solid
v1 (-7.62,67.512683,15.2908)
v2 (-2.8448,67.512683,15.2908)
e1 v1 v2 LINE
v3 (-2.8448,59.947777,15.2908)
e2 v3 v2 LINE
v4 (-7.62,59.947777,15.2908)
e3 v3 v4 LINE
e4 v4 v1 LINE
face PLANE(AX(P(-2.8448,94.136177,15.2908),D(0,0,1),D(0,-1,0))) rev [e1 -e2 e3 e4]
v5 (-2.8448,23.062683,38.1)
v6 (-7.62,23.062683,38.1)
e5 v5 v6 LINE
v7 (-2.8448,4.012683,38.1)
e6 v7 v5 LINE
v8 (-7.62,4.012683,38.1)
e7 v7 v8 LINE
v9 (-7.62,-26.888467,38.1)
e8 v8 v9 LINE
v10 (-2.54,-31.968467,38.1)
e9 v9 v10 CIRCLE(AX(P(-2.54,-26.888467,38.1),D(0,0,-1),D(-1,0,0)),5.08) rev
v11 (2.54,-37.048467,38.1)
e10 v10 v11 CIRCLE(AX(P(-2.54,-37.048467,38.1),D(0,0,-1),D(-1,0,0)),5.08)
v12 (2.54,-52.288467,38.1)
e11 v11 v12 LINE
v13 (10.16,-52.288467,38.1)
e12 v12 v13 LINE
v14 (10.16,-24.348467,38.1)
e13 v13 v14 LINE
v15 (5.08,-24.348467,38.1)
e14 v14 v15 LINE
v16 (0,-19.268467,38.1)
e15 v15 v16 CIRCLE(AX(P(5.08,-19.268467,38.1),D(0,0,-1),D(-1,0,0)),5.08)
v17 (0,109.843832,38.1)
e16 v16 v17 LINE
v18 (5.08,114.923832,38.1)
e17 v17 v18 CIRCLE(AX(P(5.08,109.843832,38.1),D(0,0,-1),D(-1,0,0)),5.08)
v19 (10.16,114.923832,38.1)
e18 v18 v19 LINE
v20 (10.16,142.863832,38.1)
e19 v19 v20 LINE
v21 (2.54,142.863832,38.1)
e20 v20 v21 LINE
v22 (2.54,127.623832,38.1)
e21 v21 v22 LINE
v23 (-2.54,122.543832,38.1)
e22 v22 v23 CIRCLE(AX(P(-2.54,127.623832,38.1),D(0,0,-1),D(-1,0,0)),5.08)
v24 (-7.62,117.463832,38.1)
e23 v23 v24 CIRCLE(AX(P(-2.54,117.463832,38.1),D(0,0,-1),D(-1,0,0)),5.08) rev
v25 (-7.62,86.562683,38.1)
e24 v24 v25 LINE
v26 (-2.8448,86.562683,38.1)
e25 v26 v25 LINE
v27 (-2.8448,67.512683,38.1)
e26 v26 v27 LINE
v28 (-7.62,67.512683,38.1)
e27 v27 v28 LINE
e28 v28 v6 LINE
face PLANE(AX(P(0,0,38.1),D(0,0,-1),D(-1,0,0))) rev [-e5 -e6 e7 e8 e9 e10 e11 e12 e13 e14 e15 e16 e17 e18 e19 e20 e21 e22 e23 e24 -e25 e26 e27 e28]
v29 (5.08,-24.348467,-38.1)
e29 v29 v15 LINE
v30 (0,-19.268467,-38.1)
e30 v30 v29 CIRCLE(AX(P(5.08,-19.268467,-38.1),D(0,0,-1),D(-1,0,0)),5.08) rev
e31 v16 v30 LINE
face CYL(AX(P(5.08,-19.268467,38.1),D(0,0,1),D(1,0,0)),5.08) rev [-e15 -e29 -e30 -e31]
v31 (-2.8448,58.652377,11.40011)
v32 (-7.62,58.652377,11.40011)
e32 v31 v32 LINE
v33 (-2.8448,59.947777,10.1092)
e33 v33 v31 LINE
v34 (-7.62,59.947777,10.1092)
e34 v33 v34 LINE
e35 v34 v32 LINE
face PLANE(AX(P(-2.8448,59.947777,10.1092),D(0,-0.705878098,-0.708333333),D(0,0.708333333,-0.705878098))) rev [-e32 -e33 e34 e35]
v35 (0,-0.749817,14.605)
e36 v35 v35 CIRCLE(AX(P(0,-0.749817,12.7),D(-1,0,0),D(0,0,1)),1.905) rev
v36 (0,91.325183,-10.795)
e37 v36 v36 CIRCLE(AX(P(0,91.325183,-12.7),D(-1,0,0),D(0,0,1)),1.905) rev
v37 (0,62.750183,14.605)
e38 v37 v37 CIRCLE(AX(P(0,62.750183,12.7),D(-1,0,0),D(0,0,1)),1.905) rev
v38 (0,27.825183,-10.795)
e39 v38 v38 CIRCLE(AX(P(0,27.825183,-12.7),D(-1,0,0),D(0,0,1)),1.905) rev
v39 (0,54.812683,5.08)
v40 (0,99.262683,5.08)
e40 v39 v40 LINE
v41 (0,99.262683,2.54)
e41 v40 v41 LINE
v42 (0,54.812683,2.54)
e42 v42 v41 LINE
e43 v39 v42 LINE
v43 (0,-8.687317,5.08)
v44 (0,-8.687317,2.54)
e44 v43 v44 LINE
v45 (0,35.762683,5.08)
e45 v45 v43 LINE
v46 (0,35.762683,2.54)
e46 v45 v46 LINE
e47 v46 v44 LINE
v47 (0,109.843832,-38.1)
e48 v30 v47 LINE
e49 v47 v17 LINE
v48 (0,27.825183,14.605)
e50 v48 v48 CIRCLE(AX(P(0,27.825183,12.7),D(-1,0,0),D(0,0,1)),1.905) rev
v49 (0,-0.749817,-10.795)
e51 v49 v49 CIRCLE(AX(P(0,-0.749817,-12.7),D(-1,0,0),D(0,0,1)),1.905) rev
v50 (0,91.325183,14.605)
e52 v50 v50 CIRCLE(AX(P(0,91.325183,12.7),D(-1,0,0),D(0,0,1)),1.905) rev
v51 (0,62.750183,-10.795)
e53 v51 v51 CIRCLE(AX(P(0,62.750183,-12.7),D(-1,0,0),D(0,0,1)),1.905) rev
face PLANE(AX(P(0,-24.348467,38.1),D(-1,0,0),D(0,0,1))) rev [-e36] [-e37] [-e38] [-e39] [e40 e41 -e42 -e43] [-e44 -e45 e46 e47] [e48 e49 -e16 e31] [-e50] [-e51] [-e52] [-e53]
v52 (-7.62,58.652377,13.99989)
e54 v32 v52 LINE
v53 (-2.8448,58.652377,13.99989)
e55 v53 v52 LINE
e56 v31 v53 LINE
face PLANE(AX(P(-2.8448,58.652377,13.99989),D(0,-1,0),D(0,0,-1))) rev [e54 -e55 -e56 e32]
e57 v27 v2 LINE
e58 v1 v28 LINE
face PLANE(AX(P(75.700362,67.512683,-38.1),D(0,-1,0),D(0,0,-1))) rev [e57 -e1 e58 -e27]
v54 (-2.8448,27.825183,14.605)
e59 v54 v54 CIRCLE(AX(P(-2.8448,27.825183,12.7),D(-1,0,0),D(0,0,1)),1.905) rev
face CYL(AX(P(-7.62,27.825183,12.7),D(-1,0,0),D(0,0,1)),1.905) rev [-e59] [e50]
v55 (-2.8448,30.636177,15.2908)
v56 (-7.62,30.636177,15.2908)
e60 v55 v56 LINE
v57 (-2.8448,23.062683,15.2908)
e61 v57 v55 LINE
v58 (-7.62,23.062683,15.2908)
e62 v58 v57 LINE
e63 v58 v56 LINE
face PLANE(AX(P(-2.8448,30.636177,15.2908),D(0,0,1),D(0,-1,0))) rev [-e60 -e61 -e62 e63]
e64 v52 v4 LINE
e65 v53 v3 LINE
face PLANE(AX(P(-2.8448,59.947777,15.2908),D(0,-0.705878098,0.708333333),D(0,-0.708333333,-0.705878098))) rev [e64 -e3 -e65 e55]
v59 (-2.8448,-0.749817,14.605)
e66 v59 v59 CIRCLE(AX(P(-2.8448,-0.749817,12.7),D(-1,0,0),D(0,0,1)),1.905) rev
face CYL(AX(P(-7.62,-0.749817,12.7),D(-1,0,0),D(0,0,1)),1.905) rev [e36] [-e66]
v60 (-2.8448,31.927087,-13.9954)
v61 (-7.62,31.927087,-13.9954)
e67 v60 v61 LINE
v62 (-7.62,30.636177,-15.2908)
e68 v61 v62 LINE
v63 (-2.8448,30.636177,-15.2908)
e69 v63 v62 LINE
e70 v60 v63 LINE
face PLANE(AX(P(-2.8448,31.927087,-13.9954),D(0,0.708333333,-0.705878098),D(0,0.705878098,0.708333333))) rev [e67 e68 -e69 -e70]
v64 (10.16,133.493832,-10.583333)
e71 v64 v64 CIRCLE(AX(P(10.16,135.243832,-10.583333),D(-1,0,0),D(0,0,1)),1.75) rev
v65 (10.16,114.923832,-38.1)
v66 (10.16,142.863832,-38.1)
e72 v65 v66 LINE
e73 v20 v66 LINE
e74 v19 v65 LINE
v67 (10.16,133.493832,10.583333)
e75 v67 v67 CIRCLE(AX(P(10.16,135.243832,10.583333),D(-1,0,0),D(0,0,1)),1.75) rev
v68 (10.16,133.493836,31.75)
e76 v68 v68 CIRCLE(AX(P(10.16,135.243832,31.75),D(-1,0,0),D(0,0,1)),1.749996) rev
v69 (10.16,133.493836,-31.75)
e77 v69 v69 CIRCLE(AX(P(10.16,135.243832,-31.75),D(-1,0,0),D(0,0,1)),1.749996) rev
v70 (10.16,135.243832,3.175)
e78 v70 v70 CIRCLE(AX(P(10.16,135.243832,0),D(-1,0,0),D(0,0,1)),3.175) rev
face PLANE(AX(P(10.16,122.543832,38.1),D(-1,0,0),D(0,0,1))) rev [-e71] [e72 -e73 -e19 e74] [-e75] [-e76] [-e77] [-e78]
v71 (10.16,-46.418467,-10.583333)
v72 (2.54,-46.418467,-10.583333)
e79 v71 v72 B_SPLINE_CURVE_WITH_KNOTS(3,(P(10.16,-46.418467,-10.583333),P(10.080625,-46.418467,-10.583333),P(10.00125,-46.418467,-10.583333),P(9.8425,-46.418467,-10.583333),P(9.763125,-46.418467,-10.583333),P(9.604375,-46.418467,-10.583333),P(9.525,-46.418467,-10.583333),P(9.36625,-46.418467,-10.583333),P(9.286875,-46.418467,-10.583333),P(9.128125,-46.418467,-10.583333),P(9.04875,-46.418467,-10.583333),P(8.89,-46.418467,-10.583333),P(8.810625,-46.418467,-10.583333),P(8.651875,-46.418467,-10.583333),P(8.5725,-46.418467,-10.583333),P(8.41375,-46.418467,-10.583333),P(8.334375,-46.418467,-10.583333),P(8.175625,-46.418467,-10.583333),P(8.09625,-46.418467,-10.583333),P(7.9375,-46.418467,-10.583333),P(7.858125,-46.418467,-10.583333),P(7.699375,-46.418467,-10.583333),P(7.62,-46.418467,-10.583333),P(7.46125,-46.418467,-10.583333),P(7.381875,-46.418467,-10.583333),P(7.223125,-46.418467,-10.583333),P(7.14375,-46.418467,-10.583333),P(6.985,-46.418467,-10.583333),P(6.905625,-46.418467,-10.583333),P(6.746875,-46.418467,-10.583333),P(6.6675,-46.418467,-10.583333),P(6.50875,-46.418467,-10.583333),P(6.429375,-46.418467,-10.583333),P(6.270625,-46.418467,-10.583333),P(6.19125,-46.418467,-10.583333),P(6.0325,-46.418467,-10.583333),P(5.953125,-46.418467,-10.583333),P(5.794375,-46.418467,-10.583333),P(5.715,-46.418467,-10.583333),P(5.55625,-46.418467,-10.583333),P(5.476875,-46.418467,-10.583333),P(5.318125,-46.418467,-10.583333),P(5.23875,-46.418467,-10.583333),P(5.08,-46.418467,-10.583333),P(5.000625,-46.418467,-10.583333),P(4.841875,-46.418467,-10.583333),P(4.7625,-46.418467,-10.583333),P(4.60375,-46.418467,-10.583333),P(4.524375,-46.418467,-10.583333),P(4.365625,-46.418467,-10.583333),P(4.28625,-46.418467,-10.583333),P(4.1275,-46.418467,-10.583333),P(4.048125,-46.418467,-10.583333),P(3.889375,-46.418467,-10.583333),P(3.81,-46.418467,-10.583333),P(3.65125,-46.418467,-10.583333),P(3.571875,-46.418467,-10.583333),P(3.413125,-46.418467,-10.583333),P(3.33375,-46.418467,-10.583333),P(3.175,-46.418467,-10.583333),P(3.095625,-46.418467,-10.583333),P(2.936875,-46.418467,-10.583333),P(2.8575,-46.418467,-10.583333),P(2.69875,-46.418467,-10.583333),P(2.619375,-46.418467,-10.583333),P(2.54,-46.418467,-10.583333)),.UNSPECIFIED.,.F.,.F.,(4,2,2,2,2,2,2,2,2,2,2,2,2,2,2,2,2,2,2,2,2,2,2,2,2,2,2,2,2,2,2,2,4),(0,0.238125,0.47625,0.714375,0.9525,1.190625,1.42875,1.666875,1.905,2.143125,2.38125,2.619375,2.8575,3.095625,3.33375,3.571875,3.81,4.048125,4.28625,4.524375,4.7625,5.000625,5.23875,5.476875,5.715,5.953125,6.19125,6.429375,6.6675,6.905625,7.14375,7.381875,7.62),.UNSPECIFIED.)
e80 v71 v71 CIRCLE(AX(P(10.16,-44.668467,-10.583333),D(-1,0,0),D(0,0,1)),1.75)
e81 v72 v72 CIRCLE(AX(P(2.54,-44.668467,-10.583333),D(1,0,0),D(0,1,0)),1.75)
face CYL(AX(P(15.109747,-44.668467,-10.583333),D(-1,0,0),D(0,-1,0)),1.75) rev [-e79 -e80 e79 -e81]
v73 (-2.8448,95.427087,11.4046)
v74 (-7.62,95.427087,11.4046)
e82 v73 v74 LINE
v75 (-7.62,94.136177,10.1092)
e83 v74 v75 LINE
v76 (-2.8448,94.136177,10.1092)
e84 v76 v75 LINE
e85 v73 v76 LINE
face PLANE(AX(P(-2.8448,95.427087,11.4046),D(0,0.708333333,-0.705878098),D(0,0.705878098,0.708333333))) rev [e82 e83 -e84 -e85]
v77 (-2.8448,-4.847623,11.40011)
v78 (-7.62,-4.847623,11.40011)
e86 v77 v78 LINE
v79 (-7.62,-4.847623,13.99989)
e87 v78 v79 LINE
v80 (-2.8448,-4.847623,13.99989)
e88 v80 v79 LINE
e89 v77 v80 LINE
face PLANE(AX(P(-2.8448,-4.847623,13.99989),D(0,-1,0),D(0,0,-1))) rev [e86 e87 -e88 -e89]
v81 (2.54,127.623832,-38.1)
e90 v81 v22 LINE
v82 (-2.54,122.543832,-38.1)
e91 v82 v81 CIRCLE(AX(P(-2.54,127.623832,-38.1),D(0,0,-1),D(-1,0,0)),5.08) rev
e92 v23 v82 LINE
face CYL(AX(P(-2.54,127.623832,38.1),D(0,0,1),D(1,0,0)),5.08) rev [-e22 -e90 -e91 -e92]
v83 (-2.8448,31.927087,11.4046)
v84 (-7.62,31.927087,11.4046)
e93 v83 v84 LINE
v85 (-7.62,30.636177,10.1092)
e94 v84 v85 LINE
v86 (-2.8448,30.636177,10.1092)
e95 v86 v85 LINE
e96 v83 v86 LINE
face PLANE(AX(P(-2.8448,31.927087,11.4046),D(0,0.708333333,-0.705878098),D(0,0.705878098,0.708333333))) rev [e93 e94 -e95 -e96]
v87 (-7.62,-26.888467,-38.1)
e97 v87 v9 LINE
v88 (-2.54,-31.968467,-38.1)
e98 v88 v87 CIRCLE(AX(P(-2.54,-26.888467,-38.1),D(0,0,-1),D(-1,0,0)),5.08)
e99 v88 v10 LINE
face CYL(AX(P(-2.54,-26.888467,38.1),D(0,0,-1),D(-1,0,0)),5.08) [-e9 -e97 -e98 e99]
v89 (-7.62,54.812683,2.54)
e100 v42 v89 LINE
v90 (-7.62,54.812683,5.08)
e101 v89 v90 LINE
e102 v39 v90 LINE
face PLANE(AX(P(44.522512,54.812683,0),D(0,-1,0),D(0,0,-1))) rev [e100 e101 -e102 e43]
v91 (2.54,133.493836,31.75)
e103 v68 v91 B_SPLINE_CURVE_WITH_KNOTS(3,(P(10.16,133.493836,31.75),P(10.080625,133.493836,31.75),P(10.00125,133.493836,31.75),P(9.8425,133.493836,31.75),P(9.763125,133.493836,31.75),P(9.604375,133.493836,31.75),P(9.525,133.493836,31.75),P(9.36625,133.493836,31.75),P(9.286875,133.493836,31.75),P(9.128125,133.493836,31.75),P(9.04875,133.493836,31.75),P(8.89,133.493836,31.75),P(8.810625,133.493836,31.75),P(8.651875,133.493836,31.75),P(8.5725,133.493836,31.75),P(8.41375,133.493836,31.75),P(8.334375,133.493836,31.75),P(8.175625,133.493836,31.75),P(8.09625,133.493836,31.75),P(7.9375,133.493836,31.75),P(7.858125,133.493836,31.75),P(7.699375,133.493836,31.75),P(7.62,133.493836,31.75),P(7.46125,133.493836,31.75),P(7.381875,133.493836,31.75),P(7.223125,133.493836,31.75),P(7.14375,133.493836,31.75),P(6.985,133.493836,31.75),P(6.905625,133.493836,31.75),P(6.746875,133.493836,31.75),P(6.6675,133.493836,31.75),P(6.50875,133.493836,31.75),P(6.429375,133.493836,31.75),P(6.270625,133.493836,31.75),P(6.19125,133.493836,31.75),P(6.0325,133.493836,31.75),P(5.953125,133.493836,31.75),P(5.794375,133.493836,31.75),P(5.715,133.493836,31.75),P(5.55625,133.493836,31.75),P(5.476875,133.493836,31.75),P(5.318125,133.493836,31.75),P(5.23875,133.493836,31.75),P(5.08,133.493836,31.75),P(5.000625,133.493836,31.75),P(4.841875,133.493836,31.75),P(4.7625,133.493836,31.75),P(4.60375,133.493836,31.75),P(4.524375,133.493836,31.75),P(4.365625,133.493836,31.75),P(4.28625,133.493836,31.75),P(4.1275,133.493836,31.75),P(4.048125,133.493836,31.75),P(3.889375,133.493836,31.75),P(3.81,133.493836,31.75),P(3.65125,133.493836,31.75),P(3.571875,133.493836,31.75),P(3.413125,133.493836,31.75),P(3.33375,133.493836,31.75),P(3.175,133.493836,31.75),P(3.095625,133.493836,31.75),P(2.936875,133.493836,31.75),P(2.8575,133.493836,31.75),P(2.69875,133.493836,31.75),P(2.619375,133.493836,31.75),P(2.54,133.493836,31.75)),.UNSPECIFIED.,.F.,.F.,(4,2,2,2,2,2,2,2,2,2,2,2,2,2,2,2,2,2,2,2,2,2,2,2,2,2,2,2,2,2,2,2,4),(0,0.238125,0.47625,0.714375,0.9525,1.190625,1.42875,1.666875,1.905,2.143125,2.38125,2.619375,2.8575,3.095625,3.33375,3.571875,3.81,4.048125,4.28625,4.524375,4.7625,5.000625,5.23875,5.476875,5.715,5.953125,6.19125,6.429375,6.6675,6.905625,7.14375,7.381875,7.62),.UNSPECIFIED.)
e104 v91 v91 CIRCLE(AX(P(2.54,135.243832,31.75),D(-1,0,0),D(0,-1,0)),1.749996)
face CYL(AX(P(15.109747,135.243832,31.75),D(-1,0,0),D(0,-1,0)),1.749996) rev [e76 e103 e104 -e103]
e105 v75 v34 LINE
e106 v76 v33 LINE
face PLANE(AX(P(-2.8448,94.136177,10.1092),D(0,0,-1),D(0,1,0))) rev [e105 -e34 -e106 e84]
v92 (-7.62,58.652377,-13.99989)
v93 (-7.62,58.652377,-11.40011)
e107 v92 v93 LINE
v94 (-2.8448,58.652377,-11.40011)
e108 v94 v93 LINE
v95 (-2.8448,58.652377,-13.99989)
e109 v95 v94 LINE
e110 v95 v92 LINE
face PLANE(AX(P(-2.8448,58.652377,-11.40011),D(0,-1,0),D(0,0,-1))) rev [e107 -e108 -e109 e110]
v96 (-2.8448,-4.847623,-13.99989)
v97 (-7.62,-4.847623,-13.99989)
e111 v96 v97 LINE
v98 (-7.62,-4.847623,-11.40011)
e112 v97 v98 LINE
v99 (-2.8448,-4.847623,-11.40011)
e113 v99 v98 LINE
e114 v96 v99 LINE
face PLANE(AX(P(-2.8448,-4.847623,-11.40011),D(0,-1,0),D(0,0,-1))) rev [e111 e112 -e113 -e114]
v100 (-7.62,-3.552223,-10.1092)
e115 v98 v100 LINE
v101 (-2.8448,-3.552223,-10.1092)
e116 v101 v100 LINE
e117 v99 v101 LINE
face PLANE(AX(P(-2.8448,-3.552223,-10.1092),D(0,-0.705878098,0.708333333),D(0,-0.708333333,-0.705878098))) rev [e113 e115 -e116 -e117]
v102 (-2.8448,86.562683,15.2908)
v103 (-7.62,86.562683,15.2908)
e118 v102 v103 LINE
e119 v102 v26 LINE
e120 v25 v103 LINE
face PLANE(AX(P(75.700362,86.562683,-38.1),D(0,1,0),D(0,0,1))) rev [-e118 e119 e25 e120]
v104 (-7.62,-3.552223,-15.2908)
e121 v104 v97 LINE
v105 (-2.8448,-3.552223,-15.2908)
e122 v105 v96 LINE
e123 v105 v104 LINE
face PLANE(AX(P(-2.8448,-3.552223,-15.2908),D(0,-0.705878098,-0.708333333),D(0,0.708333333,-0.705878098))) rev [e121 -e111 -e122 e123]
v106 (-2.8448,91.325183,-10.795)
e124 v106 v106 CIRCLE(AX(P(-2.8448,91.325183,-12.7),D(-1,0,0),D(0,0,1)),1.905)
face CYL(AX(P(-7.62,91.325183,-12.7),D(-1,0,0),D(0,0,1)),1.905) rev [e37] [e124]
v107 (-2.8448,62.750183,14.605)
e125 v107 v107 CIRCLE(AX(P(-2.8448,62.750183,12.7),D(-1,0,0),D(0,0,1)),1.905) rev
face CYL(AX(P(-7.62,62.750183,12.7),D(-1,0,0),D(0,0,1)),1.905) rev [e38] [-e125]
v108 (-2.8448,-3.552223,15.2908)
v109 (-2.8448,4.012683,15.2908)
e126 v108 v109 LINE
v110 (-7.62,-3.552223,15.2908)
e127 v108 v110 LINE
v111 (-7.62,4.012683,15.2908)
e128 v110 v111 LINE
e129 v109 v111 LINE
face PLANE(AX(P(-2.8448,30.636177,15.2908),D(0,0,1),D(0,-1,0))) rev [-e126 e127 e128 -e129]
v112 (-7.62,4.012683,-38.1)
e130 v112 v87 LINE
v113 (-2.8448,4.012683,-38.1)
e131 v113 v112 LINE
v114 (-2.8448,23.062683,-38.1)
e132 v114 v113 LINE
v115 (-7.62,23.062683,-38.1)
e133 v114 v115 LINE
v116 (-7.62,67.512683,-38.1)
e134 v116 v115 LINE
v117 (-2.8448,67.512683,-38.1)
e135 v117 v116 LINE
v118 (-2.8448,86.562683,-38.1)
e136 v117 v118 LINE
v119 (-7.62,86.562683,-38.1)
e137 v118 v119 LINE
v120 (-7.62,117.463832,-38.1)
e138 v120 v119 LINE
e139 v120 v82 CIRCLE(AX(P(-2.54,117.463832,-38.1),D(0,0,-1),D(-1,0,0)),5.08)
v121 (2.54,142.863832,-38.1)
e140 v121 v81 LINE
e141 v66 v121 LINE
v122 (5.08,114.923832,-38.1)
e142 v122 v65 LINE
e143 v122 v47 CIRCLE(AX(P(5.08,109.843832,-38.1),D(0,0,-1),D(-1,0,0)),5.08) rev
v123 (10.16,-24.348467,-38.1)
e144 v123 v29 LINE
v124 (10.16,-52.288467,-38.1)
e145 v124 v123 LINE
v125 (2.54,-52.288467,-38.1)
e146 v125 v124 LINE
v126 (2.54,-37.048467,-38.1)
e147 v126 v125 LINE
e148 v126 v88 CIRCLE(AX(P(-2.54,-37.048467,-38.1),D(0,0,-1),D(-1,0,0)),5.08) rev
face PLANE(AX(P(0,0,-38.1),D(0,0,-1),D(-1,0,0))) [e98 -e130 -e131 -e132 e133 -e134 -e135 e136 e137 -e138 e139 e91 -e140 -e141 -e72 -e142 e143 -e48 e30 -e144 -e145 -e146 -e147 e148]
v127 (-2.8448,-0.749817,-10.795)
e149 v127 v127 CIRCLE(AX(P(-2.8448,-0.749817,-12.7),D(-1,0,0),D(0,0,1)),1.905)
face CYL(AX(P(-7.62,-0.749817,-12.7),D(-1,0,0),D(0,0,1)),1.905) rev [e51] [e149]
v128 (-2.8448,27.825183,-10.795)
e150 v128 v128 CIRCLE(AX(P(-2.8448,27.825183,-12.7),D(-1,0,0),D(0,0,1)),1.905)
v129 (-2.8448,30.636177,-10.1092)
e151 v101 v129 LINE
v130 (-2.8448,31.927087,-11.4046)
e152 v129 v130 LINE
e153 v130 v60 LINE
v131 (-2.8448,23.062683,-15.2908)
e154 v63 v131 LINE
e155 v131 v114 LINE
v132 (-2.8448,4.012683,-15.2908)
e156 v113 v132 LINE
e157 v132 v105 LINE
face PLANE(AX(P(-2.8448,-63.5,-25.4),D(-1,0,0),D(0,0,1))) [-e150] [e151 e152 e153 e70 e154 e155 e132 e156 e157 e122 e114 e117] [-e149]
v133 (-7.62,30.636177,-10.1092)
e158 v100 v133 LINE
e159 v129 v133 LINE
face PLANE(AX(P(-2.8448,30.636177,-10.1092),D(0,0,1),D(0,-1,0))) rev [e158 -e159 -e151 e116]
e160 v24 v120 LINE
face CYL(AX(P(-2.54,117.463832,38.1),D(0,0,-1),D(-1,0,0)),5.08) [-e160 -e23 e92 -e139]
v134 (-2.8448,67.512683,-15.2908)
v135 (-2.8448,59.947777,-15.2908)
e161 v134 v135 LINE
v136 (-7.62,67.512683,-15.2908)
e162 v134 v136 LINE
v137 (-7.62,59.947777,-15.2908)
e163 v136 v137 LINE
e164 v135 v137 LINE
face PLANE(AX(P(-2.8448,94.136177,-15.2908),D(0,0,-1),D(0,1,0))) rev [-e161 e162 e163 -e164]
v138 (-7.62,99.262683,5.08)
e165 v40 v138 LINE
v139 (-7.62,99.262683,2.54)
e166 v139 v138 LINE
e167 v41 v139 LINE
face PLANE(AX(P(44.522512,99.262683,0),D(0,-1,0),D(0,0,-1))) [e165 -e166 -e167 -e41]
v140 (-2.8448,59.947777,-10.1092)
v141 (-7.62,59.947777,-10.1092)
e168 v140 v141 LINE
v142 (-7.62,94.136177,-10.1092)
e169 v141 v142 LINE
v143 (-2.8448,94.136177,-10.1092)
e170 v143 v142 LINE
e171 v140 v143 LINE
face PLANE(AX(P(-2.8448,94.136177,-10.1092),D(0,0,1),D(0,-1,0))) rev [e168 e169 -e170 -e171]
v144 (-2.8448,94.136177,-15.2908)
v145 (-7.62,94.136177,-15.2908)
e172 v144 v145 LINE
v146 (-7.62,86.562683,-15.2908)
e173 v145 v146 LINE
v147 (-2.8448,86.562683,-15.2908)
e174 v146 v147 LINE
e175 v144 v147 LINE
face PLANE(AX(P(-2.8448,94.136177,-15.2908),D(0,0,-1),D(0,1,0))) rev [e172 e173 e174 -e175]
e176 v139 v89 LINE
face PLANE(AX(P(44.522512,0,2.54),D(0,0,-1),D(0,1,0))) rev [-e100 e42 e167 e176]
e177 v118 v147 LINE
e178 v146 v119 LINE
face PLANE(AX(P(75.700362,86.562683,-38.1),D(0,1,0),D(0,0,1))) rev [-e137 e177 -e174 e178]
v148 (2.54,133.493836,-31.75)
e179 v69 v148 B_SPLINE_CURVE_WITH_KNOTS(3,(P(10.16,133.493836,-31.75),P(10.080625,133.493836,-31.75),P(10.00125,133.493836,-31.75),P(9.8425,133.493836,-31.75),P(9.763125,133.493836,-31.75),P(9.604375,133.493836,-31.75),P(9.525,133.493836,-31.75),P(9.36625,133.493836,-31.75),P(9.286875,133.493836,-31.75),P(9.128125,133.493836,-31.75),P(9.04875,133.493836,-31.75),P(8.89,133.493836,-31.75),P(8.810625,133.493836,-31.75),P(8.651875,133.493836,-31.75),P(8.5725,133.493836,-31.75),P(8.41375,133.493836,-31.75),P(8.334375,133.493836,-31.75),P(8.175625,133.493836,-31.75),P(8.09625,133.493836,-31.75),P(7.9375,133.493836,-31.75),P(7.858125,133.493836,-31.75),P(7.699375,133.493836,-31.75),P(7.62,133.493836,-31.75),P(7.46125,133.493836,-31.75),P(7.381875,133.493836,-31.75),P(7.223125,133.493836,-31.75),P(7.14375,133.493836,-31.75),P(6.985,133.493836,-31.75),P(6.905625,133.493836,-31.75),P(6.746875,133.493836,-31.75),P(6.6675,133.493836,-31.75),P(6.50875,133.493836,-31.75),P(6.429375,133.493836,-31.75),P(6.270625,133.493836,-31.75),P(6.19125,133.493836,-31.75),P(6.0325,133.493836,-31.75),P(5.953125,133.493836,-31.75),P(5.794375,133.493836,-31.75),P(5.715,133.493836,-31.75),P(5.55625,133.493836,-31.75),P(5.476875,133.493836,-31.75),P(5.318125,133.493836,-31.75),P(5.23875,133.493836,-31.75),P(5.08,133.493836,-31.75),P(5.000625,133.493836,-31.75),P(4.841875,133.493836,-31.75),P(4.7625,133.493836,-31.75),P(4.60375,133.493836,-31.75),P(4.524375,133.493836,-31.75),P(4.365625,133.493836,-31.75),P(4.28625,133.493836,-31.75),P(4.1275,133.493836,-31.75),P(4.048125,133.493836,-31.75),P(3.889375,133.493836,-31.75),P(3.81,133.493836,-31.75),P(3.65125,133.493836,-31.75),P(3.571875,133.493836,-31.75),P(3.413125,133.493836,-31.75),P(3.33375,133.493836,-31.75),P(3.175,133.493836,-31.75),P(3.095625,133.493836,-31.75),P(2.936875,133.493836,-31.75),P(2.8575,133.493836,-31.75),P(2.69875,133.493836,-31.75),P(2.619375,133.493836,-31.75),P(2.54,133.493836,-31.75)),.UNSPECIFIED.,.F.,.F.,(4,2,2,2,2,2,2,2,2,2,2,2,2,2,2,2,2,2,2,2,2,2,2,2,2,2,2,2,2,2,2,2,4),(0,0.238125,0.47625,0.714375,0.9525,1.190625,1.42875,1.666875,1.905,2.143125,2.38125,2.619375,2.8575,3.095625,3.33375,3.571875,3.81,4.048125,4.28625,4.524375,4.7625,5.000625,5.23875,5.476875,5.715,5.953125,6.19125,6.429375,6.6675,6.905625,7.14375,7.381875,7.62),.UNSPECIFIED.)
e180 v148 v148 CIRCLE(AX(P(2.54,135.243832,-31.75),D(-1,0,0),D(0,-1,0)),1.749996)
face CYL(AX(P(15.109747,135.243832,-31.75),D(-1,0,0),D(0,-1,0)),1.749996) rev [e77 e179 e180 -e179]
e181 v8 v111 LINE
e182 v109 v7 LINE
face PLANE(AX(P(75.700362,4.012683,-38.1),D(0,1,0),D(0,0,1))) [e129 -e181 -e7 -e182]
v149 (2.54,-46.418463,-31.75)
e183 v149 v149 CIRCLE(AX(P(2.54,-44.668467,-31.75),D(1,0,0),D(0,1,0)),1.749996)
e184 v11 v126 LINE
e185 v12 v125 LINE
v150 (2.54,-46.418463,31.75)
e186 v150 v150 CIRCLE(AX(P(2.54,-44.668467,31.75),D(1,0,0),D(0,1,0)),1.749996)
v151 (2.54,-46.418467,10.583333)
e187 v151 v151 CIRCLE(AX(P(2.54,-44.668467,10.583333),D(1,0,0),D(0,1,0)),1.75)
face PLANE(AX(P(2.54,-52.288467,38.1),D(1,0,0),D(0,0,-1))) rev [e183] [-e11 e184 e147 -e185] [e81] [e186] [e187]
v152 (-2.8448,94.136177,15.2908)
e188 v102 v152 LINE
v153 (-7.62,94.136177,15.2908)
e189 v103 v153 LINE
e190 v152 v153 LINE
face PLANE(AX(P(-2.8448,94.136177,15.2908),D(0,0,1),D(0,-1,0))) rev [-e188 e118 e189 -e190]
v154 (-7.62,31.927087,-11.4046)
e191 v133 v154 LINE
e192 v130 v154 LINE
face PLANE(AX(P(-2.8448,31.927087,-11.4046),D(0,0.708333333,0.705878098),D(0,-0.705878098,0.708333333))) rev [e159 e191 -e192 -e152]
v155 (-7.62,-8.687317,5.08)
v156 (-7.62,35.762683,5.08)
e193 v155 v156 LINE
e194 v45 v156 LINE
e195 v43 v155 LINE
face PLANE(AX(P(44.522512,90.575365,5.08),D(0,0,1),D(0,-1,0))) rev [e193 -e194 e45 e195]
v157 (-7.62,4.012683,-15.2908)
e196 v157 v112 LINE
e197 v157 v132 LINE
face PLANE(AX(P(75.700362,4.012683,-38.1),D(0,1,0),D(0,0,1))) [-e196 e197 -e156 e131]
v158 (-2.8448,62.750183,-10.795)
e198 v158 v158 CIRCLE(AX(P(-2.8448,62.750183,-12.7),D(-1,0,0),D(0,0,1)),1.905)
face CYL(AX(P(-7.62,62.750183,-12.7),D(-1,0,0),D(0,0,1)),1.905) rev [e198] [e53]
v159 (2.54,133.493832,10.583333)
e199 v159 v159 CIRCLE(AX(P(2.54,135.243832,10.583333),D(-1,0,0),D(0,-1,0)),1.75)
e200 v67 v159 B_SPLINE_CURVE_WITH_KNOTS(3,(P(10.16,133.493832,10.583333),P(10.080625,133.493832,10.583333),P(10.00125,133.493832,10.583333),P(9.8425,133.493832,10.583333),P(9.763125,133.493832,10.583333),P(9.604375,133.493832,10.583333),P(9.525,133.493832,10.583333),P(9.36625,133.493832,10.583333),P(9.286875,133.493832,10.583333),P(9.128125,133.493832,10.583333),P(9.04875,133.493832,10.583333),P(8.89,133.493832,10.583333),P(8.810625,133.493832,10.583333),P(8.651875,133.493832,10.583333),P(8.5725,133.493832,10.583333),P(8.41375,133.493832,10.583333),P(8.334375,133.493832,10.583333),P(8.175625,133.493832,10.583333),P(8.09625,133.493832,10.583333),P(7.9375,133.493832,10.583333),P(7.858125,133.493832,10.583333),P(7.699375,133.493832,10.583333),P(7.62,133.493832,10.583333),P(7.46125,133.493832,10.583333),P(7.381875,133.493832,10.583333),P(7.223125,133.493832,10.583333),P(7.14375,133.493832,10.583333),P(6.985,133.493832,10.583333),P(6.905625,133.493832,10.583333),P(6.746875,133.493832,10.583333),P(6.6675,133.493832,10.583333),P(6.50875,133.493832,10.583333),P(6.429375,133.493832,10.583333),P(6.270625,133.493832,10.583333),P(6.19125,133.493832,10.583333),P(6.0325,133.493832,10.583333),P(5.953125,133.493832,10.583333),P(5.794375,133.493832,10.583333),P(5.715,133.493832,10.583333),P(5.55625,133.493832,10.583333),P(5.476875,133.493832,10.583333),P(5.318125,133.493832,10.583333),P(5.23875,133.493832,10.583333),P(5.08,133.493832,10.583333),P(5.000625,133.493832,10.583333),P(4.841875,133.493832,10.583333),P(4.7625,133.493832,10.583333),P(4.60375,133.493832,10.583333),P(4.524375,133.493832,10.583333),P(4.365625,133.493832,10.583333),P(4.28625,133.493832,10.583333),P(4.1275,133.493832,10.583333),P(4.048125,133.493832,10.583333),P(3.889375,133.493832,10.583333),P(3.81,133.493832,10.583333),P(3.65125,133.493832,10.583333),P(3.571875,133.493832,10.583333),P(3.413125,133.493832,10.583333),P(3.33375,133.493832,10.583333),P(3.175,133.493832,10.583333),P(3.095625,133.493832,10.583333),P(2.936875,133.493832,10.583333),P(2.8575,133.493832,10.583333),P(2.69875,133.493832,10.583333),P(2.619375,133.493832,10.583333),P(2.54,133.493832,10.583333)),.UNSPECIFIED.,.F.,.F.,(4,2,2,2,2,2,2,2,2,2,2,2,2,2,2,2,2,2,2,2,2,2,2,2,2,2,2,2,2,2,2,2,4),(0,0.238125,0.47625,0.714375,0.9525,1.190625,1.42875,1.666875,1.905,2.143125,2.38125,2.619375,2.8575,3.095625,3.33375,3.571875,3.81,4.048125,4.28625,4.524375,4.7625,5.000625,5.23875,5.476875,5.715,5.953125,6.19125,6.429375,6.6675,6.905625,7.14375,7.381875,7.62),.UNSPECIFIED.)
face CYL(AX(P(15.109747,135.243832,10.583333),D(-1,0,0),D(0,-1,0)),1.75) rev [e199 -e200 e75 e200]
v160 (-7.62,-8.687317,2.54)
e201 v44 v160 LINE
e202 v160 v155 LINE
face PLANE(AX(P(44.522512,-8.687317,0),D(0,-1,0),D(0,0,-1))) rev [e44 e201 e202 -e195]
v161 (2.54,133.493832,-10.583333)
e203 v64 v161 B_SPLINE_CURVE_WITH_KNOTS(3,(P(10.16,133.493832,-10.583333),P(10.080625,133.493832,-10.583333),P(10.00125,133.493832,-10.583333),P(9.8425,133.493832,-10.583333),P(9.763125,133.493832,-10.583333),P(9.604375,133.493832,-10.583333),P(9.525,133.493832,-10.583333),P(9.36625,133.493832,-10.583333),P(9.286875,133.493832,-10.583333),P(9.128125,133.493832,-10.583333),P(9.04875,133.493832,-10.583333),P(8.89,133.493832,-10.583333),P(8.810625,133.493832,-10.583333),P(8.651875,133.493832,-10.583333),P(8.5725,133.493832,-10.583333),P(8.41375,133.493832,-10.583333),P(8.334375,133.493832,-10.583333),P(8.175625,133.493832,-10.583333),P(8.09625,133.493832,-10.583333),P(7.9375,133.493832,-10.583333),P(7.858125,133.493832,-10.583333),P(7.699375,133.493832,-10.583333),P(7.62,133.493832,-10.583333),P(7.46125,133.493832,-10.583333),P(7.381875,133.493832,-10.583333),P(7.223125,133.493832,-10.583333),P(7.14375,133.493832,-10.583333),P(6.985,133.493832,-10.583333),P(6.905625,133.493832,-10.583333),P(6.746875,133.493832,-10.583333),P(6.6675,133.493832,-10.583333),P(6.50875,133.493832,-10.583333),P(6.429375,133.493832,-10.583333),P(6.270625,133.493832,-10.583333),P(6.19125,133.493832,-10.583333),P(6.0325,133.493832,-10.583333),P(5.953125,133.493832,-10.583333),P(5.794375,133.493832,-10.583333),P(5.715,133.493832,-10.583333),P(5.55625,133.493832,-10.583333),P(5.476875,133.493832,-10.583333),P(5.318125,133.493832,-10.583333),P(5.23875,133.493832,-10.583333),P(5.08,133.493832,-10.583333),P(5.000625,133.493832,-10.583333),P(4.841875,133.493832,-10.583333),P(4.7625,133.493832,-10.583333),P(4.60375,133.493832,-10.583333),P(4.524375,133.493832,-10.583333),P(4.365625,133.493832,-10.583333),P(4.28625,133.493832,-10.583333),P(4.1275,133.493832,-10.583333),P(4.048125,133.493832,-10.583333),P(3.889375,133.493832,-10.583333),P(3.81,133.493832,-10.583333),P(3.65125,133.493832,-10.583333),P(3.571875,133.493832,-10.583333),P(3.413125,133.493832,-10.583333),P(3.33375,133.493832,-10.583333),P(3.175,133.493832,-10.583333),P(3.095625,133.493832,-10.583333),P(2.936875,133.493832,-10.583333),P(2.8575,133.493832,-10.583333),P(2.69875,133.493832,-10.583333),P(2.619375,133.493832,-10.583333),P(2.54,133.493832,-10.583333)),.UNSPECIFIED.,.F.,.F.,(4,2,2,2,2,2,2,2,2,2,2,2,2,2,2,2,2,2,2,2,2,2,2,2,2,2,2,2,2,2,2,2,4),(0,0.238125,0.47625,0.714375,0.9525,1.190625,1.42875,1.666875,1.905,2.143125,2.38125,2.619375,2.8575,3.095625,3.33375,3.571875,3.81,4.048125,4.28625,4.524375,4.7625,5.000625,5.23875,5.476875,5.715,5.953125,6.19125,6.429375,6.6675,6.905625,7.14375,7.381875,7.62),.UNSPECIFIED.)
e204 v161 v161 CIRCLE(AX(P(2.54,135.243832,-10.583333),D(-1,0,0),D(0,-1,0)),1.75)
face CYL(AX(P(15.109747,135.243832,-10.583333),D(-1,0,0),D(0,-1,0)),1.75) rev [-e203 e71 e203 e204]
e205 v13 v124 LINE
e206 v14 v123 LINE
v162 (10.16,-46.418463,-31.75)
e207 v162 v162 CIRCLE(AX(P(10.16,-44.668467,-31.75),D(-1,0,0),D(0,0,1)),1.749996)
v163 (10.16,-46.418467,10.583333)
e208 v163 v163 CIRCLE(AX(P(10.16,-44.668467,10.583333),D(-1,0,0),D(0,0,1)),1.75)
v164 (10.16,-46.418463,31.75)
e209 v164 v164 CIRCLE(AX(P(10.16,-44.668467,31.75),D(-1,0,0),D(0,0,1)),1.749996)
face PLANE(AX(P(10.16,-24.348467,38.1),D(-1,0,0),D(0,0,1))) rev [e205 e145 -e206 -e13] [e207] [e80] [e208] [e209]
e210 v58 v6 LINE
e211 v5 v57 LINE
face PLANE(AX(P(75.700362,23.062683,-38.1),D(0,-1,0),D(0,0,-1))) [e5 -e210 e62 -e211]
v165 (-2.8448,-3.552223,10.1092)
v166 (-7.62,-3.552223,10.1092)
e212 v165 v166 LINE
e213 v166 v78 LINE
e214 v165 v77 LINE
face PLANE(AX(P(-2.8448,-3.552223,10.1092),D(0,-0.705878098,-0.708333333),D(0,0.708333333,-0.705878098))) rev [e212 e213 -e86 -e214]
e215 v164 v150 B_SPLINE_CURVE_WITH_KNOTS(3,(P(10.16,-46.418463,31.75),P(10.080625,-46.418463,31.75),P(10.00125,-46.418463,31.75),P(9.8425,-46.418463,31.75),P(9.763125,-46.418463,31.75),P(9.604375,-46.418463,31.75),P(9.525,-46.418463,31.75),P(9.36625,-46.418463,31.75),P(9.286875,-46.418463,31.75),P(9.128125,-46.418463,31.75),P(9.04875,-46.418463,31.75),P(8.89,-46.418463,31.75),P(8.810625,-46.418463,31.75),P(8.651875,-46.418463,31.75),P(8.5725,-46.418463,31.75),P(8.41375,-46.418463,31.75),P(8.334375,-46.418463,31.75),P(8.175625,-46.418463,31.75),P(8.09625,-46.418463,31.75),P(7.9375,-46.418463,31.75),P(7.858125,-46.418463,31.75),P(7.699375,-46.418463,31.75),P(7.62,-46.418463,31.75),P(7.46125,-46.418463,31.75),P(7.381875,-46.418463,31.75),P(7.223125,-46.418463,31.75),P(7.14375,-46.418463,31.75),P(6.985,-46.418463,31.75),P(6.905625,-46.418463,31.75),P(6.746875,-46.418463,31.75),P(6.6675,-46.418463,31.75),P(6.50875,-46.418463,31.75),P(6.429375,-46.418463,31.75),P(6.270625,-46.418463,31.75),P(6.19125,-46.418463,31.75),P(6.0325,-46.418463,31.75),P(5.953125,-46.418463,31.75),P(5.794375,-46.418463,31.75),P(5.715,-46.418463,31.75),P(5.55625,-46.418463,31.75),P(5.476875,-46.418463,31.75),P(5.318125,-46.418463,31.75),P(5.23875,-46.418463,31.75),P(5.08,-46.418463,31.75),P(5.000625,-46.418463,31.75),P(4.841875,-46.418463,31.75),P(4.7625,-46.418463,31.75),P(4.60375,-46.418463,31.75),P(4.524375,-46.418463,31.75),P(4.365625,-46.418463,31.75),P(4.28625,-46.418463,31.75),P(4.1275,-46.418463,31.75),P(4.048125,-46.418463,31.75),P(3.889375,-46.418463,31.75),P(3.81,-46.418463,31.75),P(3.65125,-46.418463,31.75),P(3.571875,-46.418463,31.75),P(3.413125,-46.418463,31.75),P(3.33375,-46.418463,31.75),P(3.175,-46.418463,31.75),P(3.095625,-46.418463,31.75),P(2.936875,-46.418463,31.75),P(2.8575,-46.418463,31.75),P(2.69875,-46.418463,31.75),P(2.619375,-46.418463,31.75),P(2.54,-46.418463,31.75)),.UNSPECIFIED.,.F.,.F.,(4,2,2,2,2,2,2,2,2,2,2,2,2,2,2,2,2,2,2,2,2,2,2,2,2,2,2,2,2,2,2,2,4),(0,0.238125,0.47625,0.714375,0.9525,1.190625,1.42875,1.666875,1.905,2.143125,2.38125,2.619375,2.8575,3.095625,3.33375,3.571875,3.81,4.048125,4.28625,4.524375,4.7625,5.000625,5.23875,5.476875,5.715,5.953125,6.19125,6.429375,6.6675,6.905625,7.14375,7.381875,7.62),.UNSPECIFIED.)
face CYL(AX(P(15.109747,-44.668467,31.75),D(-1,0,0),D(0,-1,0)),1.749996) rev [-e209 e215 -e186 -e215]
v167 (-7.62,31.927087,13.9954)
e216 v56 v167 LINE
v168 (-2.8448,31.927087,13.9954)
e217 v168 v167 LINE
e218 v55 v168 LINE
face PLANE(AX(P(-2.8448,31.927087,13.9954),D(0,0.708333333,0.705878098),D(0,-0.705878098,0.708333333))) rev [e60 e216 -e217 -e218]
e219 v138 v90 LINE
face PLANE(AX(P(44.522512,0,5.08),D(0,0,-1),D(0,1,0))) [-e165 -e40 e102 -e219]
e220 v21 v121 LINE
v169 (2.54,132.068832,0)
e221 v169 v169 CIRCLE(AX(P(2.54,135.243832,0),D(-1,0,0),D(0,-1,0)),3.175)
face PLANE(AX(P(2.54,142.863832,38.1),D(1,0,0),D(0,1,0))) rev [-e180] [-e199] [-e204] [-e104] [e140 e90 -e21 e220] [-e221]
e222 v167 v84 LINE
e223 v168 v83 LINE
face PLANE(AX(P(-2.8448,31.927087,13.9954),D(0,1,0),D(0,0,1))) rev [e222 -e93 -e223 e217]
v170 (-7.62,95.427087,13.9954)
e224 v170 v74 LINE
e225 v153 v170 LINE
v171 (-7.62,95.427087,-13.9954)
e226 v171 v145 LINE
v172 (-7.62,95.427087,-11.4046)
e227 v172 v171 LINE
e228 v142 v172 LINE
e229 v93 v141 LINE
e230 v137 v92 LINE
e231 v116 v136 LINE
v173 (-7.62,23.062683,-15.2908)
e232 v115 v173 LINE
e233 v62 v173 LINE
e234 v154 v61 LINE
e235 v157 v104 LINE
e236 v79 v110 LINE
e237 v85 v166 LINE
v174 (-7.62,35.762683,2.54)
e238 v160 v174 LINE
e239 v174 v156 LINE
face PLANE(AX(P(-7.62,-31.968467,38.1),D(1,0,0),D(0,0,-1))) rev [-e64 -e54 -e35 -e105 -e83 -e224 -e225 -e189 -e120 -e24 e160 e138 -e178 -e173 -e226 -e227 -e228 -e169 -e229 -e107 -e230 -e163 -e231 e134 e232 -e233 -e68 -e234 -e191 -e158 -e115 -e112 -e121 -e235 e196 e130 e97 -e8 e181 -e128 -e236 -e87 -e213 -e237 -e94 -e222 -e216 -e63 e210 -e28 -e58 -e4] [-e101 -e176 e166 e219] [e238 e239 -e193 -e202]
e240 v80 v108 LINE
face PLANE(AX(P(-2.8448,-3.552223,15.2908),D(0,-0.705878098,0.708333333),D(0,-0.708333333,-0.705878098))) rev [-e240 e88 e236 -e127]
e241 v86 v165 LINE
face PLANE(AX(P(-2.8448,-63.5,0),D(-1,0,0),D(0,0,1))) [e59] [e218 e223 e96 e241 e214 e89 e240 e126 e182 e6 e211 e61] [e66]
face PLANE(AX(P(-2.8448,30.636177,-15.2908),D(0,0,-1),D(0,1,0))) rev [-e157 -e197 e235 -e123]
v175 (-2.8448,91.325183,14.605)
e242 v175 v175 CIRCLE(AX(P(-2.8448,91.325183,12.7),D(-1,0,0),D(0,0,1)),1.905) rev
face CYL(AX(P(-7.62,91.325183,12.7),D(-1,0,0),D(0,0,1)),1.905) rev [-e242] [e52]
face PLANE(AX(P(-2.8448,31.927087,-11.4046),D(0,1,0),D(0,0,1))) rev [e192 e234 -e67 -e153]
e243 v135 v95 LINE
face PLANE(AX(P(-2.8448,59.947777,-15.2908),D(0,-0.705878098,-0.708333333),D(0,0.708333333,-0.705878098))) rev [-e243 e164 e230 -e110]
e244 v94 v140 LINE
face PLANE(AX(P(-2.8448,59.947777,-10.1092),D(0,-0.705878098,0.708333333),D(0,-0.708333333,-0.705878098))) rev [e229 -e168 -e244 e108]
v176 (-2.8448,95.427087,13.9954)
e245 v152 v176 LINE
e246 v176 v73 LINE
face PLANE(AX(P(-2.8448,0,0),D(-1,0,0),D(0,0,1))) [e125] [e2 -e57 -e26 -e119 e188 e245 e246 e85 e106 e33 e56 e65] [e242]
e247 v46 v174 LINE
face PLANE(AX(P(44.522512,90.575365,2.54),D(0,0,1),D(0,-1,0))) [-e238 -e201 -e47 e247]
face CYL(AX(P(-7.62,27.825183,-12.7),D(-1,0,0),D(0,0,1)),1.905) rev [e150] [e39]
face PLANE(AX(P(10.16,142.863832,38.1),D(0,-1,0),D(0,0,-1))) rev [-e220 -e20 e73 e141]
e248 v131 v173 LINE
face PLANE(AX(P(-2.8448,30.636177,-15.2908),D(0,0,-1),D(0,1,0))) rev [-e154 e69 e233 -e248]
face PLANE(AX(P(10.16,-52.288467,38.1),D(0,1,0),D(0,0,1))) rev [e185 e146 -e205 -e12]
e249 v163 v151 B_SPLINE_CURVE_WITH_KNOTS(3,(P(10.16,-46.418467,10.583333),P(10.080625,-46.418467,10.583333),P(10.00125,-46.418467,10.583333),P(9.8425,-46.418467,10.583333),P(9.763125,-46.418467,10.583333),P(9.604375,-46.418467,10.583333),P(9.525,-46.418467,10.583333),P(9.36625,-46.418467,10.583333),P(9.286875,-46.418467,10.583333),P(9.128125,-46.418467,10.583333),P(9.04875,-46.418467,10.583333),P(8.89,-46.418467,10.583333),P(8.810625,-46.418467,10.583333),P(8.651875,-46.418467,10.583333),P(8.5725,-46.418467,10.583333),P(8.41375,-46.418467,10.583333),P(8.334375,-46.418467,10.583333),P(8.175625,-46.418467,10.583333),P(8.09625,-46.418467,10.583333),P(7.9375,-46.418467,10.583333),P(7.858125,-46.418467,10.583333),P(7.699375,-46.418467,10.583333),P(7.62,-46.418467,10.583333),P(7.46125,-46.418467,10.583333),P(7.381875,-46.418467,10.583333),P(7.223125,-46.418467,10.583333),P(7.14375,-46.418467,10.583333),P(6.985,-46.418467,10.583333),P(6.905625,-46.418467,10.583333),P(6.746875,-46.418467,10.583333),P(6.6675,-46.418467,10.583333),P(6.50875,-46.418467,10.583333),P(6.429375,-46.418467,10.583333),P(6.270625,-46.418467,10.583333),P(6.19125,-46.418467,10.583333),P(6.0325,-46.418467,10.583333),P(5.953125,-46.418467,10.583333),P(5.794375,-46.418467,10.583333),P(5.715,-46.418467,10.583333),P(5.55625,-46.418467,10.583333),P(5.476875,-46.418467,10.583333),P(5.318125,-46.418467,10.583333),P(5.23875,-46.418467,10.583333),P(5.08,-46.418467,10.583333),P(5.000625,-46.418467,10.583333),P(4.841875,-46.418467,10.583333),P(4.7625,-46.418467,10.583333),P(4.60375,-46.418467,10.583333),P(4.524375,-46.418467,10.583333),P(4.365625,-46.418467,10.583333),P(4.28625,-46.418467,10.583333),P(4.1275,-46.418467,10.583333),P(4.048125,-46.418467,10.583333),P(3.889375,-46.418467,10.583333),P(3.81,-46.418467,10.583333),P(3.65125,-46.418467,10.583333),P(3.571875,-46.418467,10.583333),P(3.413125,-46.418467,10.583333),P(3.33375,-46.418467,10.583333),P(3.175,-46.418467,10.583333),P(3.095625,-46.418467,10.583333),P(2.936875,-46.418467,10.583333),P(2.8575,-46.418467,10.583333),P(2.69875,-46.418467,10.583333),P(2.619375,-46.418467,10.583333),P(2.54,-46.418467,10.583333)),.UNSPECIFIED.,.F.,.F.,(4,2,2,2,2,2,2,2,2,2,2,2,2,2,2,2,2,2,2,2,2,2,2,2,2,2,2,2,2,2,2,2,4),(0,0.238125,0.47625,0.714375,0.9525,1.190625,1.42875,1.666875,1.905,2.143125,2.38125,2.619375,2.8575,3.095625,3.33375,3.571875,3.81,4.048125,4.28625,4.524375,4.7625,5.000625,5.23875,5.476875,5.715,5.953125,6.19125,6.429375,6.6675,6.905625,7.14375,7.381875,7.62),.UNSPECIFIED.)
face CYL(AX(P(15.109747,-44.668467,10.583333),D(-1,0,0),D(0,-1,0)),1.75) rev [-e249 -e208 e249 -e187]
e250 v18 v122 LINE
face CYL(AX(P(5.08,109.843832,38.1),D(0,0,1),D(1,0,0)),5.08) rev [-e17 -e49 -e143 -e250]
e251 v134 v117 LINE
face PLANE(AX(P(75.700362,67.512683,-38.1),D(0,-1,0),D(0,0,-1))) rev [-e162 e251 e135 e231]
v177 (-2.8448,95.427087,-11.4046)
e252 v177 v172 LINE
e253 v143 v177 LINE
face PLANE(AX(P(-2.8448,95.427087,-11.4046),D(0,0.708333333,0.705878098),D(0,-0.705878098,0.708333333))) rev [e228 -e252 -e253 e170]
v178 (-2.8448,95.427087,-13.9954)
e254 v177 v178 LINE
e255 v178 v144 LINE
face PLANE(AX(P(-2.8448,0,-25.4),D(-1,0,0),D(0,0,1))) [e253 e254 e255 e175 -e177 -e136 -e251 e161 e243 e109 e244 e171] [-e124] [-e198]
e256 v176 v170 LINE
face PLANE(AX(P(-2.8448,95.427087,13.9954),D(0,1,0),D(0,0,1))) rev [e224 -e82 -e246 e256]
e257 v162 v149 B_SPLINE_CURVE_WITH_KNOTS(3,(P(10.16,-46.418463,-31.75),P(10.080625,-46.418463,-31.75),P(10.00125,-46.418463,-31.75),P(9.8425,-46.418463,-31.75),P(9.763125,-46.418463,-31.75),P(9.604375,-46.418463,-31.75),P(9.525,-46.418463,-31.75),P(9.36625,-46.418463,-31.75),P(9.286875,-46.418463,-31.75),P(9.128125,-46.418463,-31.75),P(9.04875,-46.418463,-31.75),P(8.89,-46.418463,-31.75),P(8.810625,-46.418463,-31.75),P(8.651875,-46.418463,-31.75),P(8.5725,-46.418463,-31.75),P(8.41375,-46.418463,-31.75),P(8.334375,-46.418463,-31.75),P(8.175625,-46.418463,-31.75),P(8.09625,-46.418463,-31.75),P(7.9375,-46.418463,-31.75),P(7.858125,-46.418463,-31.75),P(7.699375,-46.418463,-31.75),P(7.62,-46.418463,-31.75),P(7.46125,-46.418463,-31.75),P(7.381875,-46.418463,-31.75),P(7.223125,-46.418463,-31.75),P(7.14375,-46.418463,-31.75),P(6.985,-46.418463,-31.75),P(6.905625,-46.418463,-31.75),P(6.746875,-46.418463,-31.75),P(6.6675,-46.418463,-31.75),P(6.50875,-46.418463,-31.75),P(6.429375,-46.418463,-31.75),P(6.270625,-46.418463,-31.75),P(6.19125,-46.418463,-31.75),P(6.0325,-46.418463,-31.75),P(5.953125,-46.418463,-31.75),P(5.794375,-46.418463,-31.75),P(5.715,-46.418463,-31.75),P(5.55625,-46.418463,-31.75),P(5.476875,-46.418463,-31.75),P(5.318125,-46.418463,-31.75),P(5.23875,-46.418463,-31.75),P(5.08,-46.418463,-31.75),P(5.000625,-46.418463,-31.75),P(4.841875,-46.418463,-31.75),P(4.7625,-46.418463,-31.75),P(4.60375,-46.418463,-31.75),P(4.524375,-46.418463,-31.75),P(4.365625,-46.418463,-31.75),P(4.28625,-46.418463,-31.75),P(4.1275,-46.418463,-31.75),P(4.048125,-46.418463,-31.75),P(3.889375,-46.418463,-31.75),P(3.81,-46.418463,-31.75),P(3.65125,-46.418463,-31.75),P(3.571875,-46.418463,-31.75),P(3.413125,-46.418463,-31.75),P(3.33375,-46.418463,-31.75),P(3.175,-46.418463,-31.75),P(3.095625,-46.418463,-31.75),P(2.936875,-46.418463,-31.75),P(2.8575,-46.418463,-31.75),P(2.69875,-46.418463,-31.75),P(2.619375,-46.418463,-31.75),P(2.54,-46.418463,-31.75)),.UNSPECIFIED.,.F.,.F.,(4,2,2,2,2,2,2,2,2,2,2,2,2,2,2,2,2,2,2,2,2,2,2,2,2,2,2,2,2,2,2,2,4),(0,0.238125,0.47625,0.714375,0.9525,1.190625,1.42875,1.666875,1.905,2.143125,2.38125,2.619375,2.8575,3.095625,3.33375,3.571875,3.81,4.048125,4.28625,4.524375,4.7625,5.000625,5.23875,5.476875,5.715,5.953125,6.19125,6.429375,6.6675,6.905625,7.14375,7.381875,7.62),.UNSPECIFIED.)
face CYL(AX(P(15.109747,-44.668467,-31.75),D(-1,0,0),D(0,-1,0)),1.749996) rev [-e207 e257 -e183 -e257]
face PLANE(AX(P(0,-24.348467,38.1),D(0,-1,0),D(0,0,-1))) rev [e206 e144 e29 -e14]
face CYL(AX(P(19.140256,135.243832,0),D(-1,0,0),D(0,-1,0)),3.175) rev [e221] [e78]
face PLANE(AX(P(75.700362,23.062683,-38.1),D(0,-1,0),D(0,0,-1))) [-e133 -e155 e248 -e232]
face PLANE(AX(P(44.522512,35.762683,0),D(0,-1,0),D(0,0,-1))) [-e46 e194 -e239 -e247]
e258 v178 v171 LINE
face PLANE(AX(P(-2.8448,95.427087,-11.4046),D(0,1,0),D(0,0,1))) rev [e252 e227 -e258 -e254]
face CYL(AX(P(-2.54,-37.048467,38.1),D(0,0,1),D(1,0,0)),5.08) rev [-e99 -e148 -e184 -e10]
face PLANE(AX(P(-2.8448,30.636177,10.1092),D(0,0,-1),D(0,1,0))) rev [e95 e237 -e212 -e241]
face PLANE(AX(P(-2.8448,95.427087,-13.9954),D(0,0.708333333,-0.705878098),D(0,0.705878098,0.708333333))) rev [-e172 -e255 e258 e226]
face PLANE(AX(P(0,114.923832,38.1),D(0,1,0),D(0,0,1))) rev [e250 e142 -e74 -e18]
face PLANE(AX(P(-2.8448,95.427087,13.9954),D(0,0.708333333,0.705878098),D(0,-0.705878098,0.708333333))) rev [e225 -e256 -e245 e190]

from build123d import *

# Parameters (mm, degrees)
BOSS_EXTRUDE1_DEPTH               = 38.1
FILLET1_R                         = 5.08
SKETCH8_R                         = 1.7499965
SKETCH8_R_2                       = 1.75
CUT_EXTRUDE2_DEPTH                = 7.62
F_1_8_0_15_DOWEL_HOLE1_AT_2_COUNT = 2
F_1_8_0_15_DOWEL_HOLE1_AT_2_PITCH = 28.575
F_1_8_0_15_DOWEL_HOLE1_AT_3_COUNT = 2
F_1_8_0_15_DOWEL_HOLE1_AT_3_PITCH = 34.925
F_1_8_0_15_DOWEL_HOLE1_AT_4_COUNT = 2
F_1_8_0_15_DOWEL_HOLE1_AT_4_PITCH = 63.5
CUT_EXTRUDE3_DEPTH                = 4.7752
LPATTERN1_COUNT                   = 2
LPATTERN1_PITCH                   = 63.5
LPATTERN1_COUNT_DIR2              = 2
LPATTERN1_PITCH_DIR2              = 25.4
SKETCH16_W                        = 2.54
SKETCH16_H                        = 44.45
CUT_EXTRUDE4_DEPTH                = 7.62
SKETCH17_W                        = 76.2
SKETCH17_H                        = 19.05
CUT_EXTRUDE5_DEPTH                = 4.7752
SKETCH19_W                        = 12.6492
SKETCH19_H                        = 19.05
SKETCH19_W_2                      = 5.0292
BOSS_EXTRUDE6_DEPTH               = 4.7752
SKETCH22_R                        = 3.175
CGTEST1_DEPTH                     = 7.62


with BuildPart() as part:
    # Sketch1 → Boss-Extrude1 (new, symmetric)
    with BuildSketch(Plane.XY):
        Polygon((0, -24.348466848), (0, 114.923832009), (10.16, 114.923832009), (10.16, 122.543832009), (10.16, 142.863832009), (2.54, 142.863832009), (2.54, 122.543832009), (-7.62, 122.543832009), (-7.62, 114.923832009), (-7.62, -31.968466848), (2.54, -31.968466848), (2.54, -52.288466848), (10.16, -52.288466848), (10.16, -31.968466848), (10.16, -24.348466848), align=None)
    extrude(amount=BOSS_EXTRUDE1_DEPTH, both=True)

    # Fillet1
    fillet1_edges = [part.edges().sort_by_distance(p)[0] for p in [
        (0, -24.348466848, 0),
        (2.54, -31.968466848, 0),
        (0, 114.923832009, 0),
        (2.54, 122.543832009, 0),
        (-7.62, 122.543832009, 0),
        (-7.62, -31.968466848, 0),
    ]]
    fillet(fillet1_edges, radius=FILLET1_R - 0.0001)  # a hair under: the kernel refuses the full size

    # Sketch8 → Cut-Extrude2 (cut)
    with BuildSketch(Plane.ZY.offset(-2.54)):
        with Locations(Location((-31.75, 135.243832009, 0), (0, 0, 270))):
            Circle(SKETCH8_R)
        with Locations(Location((31.75, 135.243832009, 0), (0, 0, 270))):
            Circle(SKETCH8_R)
        with Locations(Location((-10.583333333, 135.243832009, 0), (0, 0, 270))):
            Circle(SKETCH8_R_2)
        with Locations(Location((10.583333333, 135.243832009, 0), (0, 0, 270))):
            Circle(SKETCH8_R_2)
    cut_extrude2 = extrude(amount=-CUT_EXTRUDE2_DEPTH, mode=Mode.SUBTRACT)

    # Mirror1: Cut-Extrude2 across plane
    add(cut_extrude2.mirror(Plane.ZX.offset(45.28768258)), mode=Mode.SUBTRACT)

    # Sketch11 → 1/8 (0.15) Dowel Hole1 (revolve, cut)
    with BuildSketch(Plane(origin=(-7.62, 27.82518258, 12.7), x_dir=(0, 0, 1), z_dir=(0, 1, 0))):
        Polygon((0, 0), (0, 8.764639479), (1.905, 7.62), (1.905, 0), align=None)
    f_1_8_0_15_dowel_hole1 = revolve(axis=Axis((-13.97, 27.82518258, 12.7), (1, 0, 0)), mode=Mode.SUBTRACT)

    # 1/8 (0.15) Dowel Hole1 at 2: 1/8 (0.15) Dowel Hole1 ×2
    with Locations(*[(0, -i * F_1_8_0_15_DOWEL_HOLE1_AT_2_PITCH, 0) for i in range(1, F_1_8_0_15_DOWEL_HOLE1_AT_2_COUNT)]):
        add(f_1_8_0_15_dowel_hole1, mode=Mode.SUBTRACT)

    # 1/8 (0.15) Dowel Hole1 at 3: 1/8 (0.15) Dowel Hole1 ×2
    with Locations(*[(0, i * F_1_8_0_15_DOWEL_HOLE1_AT_3_PITCH, 0) for i in range(1, F_1_8_0_15_DOWEL_HOLE1_AT_3_COUNT)]):
        add(f_1_8_0_15_dowel_hole1, mode=Mode.SUBTRACT)

    # 1/8 (0.15) Dowel Hole1 at 4: 1/8 (0.15) Dowel Hole1 ×2
    with Locations(*[(0, i * F_1_8_0_15_DOWEL_HOLE1_AT_4_PITCH, 0) for i in range(1, F_1_8_0_15_DOWEL_HOLE1_AT_4_COUNT)]):
        add(f_1_8_0_15_dowel_hole1, mode=Mode.SUBTRACT)

    # Sketch14 → Cut-Extrude3 (cut)
    with BuildSketch(Plane.ZY.offset(7.62)):
        Polygon((13.9954, 95.427086941), (11.4046, 95.427086941), (10.1092, 94.136177076), (10.1092, 59.947777076), (11.400109865, 58.652377076), (12.7, 58.652377076), (13.999890135, 58.652377076), (15.2908, 59.947777076), (15.2908, 94.136177076), align=None)
    cut_extrude3 = extrude(amount=-CUT_EXTRUDE3_DEPTH, mode=Mode.SUBTRACT)

    # LPattern1: Cut-Extrude3 2 × 2
    with Locations(*[(0, -i * LPATTERN1_PITCH, -j * LPATTERN1_PITCH_DIR2) for i in range(LPATTERN1_COUNT) for j in range(LPATTERN1_COUNT_DIR2) if (i, j) != (0, 0)]):
        add(cut_extrude3, mode=Mode.SUBTRACT)

    # Mirror2: 1/8 (0.15) Dowel Hole1 across plane
    add(f_1_8_0_15_dowel_hole1.mirror(Plane.XY), mode=Mode.SUBTRACT)

    # Mirror2 copy 1 sketch → Mirror2 copy 1 (revolve, cut)
    with BuildSketch(Plane(origin=(-7.62, -0.74981742, -12.7), x_dir=(0, 0, -1), z_dir=(0, 1, 0))):
        Polygon((0, 0), (0, -8.764639479), (1.905, -7.62), (1.905, 0), align=None)
    revolve(axis=Axis((-13.97, -0.74981742, -12.7), (-1, 0, 0)), mode=Mode.SUBTRACT)

    # Mirror2 copy 2 sketch → Mirror2 copy 2 (revolve, cut)
    with BuildSketch(Plane(origin=(-7.62, 62.75018258, -12.7), x_dir=(0, 0, -1), z_dir=(0, 1, 0))):
        Polygon((0, 0), (0, -8.764639479), (1.905, -7.62), (1.905, 0), align=None)
    revolve(axis=Axis((-13.97, 62.75018258, -12.7), (-1, 0, 0)), mode=Mode.SUBTRACT)

    # Mirror2 copy 3 sketch → Mirror2 copy 3 (revolve, cut)
    with BuildSketch(Plane(origin=(-7.62, 91.32518258, -12.7), x_dir=(0, 0, -1), z_dir=(0, 1, 0))):
        Polygon((0, 0), (0, -8.764639479), (1.905, -7.62), (1.905, 0), align=None)
    revolve(axis=Axis((-13.97, 91.32518258, -12.7), (-1, 0, 0)), mode=Mode.SUBTRACT)

    # Sketch16 → Cut-Extrude4 (cut)
    with BuildSketch(Plane.ZY.offset(7.62)):
        with Locations((3.81, 77.03768258)):
            Rectangle(SKETCH16_W, SKETCH16_H)
    cut_extrude4 = extrude(amount=-CUT_EXTRUDE4_DEPTH, mode=Mode.SUBTRACT)

    # Sketch17 → Cut-Extrude5 (cut)
    with BuildSketch(Plane.ZY.offset(7.62)):
        with Locations((0, 77.03768258)):
            Rectangle(SKETCH17_W, SKETCH17_H)
    cut_extrude5 = extrude(amount=-CUT_EXTRUDE5_DEPTH, mode=Mode.SUBTRACT)

    # Sketch19 → Boss-Extrude6 (add)
    with BuildSketch(Plane.ZY.offset(2.8448)):
        with Locations((-3.7846, 77.03768258)):
            Rectangle(SKETCH19_W, SKETCH19_H)
        with Locations((7.5946, 77.03768258)):
            Rectangle(SKETCH19_W_2, SKETCH19_H)
    boss_extrude6 = extrude(amount=BOSS_EXTRUDE6_DEPTH)

    # Mirror3: Cut-Extrude4, Cut-Extrude5, Boss-Extrude6 across plane
    add(cut_extrude4.mirror(Plane.ZX.offset(45.28768258)), mode=Mode.SUBTRACT)
    add(cut_extrude5.mirror(Plane.ZX.offset(45.28768258)), mode=Mode.SUBTRACT)
    add(boss_extrude6.mirror(Plane.ZX.offset(45.28768258)))

    # Sketch22 → CGTest1 (cut)
    with BuildSketch(Plane.ZY.offset(-2.54)):
        with Locations(Location((0, 135.243832009, 0), (0, 0, 270))):
            Circle(SKETCH22_R)
    extrude(amount=-CGTEST1_DEPTH, mode=Mode.SUBTRACT)


solid = part.part
